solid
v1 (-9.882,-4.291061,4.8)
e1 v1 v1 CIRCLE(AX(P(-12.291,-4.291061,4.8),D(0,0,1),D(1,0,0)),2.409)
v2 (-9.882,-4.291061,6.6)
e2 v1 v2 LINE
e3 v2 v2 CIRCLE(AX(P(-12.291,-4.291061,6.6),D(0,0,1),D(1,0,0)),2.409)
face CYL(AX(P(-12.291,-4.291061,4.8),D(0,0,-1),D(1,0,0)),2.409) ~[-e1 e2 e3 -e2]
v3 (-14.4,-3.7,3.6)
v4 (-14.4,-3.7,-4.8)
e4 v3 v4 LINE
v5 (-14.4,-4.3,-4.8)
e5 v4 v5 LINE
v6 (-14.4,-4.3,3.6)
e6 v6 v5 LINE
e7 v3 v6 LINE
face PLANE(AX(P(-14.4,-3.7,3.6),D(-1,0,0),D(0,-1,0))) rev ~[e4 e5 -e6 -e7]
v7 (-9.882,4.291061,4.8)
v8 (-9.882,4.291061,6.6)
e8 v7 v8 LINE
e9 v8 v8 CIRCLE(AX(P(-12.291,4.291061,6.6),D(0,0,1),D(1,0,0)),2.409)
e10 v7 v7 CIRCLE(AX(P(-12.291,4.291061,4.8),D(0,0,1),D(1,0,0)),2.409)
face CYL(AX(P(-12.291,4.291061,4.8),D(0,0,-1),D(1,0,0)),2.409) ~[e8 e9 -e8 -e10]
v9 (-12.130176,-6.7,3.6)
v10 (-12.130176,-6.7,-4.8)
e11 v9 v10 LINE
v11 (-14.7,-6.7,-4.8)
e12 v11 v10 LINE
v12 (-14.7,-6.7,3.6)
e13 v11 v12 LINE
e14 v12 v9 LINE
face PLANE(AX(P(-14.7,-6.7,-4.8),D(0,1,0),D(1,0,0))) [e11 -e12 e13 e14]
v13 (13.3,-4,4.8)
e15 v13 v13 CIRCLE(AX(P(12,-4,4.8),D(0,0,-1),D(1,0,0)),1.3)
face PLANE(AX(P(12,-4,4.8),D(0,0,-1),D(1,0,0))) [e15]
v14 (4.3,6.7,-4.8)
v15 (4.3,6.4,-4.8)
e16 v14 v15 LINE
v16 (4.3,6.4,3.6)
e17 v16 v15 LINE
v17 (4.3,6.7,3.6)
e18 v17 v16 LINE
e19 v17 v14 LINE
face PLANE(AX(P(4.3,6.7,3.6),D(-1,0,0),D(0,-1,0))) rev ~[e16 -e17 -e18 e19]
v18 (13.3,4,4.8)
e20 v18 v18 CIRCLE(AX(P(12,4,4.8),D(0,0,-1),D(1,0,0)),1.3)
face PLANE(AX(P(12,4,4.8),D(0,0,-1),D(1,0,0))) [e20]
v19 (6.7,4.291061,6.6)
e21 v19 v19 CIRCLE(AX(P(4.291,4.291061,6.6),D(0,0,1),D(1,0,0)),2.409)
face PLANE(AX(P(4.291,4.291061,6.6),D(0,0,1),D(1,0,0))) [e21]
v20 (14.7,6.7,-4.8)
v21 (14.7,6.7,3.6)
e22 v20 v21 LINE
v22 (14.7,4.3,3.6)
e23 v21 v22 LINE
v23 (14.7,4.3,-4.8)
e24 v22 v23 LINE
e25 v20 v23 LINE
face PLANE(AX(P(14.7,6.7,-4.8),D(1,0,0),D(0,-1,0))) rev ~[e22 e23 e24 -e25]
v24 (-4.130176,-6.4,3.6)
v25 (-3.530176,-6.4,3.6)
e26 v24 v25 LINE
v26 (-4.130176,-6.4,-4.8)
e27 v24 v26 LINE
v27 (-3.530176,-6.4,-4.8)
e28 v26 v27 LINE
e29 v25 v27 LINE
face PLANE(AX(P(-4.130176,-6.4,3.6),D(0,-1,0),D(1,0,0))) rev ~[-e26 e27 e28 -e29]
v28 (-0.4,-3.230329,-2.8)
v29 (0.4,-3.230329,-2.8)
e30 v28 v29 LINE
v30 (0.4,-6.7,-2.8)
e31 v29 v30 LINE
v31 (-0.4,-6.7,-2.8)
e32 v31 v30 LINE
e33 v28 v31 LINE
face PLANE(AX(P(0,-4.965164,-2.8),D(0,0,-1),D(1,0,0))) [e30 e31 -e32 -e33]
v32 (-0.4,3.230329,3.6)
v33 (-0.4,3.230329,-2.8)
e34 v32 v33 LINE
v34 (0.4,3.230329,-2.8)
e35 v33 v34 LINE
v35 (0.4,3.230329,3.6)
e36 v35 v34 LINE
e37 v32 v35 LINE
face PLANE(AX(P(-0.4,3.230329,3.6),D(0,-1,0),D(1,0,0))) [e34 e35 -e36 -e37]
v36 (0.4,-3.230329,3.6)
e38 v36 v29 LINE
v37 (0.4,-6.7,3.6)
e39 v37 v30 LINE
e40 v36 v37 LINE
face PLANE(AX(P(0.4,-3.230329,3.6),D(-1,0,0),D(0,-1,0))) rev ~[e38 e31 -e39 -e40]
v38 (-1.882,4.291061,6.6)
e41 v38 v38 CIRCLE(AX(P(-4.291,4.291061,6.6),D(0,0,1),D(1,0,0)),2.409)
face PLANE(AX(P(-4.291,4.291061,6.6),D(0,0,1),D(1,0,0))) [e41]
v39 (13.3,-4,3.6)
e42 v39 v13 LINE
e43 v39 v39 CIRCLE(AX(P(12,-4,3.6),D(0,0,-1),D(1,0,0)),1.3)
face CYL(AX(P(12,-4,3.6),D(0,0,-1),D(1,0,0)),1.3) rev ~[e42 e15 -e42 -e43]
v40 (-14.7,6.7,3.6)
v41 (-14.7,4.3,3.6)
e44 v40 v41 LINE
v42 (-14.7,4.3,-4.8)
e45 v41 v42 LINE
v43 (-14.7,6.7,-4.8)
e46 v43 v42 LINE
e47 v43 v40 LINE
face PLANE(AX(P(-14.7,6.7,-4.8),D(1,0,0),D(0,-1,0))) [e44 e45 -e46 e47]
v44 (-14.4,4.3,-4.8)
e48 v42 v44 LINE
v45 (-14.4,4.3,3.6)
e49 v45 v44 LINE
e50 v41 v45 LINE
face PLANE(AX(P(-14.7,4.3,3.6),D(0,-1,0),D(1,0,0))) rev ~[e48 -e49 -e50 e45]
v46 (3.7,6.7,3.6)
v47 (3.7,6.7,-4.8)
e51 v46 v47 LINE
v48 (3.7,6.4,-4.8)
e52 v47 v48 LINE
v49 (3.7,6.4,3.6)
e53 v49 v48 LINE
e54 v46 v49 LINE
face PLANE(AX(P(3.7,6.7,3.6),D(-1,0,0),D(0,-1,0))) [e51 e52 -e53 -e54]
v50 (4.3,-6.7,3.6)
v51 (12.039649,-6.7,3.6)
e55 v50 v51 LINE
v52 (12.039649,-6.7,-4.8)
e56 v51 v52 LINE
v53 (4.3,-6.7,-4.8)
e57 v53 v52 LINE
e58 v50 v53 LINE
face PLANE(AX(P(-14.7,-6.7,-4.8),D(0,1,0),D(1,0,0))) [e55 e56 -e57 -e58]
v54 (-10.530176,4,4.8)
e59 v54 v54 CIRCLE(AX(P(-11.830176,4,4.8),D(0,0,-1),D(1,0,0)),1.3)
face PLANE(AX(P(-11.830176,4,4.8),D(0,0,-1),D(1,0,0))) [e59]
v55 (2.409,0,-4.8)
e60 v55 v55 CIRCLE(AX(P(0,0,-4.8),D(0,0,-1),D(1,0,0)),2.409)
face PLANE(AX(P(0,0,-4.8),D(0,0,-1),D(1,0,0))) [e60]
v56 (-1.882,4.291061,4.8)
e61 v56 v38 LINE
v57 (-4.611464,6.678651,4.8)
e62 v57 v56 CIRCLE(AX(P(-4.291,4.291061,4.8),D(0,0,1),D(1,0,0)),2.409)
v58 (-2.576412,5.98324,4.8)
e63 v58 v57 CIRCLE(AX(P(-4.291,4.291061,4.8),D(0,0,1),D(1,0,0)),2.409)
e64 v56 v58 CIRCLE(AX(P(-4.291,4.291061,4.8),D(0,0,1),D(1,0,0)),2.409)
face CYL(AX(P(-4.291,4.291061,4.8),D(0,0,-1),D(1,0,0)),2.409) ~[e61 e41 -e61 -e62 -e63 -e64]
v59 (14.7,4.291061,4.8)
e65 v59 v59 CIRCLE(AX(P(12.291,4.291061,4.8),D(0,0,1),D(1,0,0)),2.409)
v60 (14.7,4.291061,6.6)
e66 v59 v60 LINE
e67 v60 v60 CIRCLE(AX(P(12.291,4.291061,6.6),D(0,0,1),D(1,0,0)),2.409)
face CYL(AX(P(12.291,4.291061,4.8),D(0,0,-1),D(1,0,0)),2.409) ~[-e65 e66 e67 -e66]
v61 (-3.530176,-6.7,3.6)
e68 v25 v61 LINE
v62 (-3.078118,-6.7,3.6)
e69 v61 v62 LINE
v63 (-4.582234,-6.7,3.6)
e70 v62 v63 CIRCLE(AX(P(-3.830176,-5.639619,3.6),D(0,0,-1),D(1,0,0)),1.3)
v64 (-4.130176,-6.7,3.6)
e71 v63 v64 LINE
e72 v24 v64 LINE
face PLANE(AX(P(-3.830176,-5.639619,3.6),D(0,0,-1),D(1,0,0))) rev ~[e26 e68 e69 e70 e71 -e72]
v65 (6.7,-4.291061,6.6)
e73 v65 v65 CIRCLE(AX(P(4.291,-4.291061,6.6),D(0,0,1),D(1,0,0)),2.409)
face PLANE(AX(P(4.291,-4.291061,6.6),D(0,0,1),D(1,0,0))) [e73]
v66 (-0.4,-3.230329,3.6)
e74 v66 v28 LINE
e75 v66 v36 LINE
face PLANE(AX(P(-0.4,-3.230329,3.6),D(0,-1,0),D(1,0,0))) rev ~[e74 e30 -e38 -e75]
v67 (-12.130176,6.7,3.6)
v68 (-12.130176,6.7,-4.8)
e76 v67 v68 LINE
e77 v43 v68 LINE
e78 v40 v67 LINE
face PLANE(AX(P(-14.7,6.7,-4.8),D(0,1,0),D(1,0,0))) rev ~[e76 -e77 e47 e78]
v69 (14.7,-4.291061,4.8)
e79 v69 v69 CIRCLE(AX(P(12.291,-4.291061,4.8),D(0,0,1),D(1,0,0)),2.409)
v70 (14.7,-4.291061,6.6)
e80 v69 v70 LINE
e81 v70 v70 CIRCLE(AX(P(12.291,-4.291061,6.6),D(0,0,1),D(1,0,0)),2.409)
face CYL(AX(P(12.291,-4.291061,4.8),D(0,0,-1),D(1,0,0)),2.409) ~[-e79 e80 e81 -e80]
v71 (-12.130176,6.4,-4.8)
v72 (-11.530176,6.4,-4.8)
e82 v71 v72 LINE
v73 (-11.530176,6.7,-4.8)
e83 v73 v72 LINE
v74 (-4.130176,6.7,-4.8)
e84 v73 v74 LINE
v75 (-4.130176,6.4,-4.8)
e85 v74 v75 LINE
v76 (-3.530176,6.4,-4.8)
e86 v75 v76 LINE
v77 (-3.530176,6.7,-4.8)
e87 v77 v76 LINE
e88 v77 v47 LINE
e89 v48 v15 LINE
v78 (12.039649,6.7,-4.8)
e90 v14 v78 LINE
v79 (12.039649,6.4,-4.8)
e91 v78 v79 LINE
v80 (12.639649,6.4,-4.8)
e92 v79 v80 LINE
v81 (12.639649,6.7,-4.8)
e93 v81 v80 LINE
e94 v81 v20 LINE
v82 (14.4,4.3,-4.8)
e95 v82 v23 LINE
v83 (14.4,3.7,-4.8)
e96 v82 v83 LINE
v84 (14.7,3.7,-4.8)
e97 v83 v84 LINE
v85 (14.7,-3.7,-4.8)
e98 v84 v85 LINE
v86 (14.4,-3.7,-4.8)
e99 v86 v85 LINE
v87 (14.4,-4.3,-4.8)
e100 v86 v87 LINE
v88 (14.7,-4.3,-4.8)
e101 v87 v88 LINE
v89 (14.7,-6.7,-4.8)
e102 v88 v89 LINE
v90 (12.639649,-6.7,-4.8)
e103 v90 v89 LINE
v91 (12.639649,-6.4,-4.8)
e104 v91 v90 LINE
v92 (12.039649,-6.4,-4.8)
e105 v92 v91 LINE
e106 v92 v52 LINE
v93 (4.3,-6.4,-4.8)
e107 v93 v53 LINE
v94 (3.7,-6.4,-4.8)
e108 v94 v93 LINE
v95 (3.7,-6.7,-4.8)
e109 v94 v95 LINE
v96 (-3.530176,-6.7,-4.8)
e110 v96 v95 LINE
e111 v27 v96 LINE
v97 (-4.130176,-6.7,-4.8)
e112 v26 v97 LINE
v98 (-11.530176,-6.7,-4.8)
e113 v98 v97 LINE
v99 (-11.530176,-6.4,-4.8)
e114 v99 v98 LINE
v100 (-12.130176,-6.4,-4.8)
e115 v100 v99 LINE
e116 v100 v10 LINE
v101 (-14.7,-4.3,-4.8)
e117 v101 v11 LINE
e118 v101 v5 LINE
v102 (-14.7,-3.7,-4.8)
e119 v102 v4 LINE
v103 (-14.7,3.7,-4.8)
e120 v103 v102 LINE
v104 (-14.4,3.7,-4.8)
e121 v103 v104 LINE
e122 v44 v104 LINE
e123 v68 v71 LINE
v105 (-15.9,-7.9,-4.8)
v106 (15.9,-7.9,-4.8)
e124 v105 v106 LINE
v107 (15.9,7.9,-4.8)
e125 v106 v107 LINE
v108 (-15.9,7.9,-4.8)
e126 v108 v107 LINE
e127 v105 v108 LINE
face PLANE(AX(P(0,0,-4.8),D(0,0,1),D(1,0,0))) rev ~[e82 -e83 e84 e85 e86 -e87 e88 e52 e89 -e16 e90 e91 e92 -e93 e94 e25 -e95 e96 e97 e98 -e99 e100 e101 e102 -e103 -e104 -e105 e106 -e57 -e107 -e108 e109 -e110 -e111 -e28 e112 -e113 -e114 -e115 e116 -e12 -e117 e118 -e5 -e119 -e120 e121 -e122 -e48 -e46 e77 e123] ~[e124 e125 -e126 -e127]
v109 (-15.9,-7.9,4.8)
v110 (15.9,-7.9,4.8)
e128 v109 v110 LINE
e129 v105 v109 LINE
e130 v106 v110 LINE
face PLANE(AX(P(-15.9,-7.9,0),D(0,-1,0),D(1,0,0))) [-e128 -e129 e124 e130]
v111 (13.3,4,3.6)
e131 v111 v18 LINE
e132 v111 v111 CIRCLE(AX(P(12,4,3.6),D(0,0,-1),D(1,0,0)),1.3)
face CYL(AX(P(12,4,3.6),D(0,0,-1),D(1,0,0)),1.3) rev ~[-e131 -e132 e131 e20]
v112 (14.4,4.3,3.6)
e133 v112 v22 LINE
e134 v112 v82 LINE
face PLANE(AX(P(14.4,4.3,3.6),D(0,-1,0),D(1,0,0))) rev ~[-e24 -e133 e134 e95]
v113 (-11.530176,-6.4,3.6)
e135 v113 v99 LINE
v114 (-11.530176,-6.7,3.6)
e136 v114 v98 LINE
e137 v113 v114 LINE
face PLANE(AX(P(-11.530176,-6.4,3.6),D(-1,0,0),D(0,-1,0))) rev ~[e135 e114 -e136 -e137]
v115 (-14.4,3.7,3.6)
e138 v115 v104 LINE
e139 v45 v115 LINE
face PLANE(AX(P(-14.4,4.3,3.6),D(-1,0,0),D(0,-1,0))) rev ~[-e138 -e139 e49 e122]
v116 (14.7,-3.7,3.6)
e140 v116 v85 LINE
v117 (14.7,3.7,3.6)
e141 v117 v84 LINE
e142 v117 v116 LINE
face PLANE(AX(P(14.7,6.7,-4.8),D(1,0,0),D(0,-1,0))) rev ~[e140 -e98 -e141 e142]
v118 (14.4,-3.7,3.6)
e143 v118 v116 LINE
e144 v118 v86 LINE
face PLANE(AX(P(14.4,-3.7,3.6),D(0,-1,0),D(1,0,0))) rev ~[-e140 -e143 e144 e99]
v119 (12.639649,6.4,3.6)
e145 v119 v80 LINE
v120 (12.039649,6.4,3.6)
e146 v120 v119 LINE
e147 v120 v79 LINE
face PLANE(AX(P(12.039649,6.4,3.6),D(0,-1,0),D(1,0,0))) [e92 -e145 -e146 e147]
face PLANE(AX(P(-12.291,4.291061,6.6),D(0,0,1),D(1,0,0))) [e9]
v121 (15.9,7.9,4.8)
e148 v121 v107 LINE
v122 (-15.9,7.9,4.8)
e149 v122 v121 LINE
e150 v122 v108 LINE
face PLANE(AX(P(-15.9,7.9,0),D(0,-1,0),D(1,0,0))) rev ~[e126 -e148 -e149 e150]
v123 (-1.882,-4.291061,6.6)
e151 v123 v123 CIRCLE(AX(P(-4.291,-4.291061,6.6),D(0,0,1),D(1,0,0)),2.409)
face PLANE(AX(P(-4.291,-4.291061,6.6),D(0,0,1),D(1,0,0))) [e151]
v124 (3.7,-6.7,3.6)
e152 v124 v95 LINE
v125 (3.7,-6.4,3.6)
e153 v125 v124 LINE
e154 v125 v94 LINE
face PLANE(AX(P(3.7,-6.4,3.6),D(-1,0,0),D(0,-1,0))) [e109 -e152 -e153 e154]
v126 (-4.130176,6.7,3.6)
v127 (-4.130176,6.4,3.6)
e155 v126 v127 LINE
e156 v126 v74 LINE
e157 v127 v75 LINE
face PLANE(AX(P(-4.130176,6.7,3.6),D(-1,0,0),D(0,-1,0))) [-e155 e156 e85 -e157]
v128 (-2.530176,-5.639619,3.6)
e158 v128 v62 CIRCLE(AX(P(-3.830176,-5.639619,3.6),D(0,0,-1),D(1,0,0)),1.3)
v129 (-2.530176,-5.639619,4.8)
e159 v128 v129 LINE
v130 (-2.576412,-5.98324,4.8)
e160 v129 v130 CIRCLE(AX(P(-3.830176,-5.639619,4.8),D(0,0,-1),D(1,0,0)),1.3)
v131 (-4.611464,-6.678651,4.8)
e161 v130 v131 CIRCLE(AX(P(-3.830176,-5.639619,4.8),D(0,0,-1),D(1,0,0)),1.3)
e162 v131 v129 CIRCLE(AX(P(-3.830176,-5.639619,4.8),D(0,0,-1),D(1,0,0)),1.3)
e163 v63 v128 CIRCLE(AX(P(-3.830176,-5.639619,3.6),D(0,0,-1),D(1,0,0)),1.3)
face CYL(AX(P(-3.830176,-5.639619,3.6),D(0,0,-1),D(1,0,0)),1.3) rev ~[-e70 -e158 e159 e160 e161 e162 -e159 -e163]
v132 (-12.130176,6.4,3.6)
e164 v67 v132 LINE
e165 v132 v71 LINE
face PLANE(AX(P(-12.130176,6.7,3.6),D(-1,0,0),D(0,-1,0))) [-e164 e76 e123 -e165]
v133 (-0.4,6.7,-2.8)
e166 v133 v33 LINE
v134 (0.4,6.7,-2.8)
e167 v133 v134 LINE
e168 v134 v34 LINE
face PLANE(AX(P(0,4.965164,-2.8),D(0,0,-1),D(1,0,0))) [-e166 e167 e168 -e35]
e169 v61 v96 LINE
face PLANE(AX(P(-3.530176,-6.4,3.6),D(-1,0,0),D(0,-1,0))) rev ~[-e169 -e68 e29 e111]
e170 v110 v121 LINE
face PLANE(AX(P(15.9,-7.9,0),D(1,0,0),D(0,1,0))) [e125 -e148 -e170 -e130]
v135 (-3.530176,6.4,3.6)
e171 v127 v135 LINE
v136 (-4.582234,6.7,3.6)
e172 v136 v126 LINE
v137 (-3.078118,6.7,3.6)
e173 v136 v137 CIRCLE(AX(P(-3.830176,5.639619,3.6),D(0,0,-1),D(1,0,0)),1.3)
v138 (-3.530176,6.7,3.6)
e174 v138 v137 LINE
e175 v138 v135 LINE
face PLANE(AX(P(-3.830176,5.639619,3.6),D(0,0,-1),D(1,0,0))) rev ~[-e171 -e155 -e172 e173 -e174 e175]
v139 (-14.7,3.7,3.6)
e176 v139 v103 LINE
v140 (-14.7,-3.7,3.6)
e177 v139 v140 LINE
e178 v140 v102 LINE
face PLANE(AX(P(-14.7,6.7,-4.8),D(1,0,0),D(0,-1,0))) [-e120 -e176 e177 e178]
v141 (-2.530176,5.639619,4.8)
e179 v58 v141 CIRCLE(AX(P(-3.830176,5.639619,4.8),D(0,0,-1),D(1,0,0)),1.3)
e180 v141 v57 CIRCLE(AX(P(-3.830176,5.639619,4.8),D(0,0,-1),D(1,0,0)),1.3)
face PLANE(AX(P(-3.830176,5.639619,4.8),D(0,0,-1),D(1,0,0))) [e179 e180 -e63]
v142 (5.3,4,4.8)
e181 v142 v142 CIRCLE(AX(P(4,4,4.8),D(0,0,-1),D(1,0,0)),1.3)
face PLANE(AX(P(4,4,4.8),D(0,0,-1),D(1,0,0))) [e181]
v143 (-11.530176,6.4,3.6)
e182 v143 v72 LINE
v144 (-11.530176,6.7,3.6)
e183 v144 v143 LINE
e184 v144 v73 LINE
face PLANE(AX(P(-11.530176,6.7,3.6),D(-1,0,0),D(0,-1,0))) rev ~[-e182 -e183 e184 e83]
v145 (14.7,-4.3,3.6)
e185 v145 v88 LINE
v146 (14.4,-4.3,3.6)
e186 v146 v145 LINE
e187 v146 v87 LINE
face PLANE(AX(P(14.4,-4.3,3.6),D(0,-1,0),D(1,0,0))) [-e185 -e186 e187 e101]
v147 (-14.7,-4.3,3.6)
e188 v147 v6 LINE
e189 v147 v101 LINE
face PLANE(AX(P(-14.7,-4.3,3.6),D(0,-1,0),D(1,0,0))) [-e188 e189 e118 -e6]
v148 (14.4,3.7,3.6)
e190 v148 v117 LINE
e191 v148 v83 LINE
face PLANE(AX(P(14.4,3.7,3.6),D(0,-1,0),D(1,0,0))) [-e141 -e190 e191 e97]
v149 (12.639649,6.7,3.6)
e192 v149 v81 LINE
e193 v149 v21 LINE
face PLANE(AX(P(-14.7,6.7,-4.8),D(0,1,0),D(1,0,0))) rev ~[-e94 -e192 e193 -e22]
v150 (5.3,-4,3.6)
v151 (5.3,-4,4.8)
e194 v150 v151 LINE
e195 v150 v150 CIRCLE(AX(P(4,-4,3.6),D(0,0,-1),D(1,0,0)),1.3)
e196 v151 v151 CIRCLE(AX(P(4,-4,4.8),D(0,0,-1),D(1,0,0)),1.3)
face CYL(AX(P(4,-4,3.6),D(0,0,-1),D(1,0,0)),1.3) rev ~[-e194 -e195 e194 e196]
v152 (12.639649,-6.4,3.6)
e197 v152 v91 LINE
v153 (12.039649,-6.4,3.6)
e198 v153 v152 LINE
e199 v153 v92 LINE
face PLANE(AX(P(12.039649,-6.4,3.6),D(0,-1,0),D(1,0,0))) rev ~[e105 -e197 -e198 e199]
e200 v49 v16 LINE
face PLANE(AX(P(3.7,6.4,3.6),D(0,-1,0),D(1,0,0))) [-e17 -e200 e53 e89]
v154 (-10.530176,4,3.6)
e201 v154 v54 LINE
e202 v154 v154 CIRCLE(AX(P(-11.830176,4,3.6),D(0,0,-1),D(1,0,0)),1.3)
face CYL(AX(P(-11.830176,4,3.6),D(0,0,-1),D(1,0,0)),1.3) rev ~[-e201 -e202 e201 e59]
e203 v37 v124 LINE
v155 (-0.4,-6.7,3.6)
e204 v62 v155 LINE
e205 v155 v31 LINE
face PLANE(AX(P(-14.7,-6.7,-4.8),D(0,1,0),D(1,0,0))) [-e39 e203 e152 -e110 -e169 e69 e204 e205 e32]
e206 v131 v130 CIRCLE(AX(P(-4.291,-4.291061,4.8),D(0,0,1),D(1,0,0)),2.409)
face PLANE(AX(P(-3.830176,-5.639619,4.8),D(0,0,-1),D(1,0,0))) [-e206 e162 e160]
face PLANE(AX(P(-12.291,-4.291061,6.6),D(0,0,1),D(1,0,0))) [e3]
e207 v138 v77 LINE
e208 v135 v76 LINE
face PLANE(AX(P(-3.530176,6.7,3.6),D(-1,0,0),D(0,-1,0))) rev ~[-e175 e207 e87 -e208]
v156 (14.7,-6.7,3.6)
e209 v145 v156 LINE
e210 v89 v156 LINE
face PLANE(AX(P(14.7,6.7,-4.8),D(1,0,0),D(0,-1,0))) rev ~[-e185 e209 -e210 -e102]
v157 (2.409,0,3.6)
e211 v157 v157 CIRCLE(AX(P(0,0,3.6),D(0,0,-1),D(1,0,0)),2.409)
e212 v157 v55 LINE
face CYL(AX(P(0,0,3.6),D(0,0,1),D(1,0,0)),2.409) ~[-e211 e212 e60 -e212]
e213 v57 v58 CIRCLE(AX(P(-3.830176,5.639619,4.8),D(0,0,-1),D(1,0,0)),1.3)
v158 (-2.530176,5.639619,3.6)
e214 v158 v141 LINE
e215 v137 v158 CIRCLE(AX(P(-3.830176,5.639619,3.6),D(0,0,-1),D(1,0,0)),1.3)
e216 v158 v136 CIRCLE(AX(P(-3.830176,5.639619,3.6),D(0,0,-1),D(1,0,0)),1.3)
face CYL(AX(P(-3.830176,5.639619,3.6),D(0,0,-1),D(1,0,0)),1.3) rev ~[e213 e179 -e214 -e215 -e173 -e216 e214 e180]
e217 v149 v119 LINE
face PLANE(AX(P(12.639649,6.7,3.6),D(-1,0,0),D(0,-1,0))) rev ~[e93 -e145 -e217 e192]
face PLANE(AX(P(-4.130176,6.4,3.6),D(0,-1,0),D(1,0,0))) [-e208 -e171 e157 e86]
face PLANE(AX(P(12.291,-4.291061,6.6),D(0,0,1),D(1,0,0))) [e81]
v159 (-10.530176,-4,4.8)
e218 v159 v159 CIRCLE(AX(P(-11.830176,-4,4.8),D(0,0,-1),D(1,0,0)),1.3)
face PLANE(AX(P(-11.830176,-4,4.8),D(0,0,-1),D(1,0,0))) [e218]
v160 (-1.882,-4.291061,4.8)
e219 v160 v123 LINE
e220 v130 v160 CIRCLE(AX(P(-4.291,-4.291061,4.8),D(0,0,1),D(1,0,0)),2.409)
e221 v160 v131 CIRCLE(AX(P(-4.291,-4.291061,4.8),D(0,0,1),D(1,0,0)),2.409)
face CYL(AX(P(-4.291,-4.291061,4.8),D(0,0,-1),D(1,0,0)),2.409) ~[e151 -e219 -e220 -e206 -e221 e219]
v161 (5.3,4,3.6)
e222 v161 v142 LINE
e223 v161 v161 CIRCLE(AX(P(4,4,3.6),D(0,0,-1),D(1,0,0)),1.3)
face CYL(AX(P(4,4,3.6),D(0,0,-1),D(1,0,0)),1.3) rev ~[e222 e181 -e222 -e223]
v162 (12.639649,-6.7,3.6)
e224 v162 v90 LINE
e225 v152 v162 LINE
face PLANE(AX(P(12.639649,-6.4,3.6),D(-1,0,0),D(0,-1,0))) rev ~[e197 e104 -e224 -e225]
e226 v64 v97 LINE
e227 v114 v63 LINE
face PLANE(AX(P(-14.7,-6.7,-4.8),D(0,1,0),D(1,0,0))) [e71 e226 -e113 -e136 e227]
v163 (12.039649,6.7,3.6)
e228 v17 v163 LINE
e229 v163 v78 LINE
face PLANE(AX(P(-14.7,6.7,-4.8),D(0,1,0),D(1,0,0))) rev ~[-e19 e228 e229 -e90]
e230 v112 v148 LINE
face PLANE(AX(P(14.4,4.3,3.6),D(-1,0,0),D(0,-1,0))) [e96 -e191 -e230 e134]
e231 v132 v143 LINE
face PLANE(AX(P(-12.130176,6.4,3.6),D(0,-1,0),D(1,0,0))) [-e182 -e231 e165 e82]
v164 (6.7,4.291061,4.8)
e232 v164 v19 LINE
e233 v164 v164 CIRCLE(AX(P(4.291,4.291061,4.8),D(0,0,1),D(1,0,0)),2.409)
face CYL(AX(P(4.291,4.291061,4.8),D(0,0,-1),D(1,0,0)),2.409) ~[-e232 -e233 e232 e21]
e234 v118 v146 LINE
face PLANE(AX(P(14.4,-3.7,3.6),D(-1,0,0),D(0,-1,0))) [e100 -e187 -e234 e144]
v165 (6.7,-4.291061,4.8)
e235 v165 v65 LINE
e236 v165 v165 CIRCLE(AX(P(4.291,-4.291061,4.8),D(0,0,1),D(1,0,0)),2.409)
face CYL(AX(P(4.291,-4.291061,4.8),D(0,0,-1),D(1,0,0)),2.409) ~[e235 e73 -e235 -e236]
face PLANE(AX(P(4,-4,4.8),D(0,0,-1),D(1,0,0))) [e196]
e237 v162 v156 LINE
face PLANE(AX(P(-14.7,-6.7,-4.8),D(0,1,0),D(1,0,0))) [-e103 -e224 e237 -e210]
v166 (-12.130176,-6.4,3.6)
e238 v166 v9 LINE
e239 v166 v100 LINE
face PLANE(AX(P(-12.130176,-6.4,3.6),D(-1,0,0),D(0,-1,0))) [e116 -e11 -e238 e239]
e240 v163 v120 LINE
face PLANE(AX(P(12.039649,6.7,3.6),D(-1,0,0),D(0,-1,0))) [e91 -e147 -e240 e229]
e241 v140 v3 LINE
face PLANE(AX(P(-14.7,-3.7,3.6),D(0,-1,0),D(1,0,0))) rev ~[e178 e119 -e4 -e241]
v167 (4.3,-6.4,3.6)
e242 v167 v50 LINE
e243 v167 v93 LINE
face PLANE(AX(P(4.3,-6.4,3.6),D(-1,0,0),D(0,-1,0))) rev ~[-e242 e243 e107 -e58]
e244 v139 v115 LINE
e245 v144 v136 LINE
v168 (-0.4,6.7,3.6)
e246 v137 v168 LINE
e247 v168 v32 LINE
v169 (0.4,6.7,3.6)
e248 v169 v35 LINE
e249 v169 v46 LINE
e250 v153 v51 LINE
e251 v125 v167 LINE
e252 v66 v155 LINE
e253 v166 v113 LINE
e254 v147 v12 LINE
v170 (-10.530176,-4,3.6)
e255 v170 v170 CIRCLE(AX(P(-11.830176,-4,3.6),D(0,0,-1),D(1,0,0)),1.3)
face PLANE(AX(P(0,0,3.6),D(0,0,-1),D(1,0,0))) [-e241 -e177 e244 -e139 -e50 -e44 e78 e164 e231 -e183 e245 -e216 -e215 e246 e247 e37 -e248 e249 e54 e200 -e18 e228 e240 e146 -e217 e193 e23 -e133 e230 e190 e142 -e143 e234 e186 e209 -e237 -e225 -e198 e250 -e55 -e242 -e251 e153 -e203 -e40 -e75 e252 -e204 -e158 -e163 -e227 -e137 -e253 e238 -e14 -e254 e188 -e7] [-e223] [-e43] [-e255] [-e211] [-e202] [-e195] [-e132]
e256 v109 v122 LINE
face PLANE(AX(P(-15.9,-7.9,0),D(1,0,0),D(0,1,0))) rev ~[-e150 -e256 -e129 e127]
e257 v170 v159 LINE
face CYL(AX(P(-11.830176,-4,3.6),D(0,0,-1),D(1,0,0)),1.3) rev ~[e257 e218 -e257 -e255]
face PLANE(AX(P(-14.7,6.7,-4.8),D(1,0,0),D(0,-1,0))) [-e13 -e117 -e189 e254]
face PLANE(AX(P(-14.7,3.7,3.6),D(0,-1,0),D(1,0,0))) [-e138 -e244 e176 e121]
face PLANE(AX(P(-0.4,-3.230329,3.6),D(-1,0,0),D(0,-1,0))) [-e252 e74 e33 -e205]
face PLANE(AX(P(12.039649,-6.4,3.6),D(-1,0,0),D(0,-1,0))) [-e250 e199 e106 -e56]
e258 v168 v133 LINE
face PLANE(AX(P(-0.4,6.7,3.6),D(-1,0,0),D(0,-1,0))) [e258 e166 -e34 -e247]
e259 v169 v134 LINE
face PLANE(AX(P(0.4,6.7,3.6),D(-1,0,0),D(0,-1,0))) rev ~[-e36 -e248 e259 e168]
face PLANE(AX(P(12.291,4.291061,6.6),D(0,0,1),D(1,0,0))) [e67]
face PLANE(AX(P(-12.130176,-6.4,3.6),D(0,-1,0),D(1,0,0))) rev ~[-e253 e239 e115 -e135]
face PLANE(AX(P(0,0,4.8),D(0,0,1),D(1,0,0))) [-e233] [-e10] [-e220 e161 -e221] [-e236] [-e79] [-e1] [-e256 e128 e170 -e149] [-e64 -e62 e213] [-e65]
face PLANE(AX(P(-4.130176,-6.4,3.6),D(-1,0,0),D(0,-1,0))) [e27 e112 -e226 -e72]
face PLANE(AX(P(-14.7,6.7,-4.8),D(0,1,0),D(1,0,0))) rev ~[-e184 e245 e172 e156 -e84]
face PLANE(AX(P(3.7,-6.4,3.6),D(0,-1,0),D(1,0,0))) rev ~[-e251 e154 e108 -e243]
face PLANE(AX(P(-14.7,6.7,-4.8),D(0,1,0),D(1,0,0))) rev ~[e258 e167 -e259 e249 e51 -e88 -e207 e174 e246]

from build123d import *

# Parameters (mm, degrees)
F0_W      = 31.8
F0_H      = 15.8
F1_DEPTH  = 4.8
F2_W      = 29.4
F2_H      = 13.4
F3_DEPTH  = 8.4
F4_R      = 2.409
F5_DEPTH  = 1.8
F6_R      = 1.3
F7_DEPTH  = 1.2
F8_R      = 2.409
F9_DEPTH  = 8.4
F10_W     = 0.3
F10_H     = 0.6
F11_DEPTH = 8.4
F12_W     = 0.6
F12_H     = 0.3
F13_DEPTH = 8.4
F14_W     = 0.8
F14_H     = 3.4696710694
F15_DEPTH = 6.4


with BuildPart() as f1:
    # F0 (on Top) → F1 (new body, symmetric)
    with BuildSketch(Plane.XY):
        Rectangle(F0_W, F0_H)
    extrude(amount=F1_DEPTH, both=True)

    # F2 (on face) → F3 (cut)
    with BuildSketch(Plane(origin=(0, 0, -4.8), x_dir=(1, 0, 0), z_dir=(0, 0, -1))):
        Rectangle(F2_W, F2_H)
    extrude(amount=-F3_DEPTH, mode=Mode.SUBTRACT)

    # F4 (on face) → F5 (join)
    with BuildSketch(Plane.XY.offset(4.8)):
        with Locations((-12.291, 4.2910612803)):
            Circle(F4_R)
        with Locations((12.291, 4.2910612803)):
            Circle(F4_R)
        with Locations((-12.291, -4.2910612803)):
            Circle(F4_R)
        with Locations((12.291, -4.2910612803)):
            Circle(F4_R)
        with Locations((-4.291, 4.2910612803)):
            Circle(F4_R)
        with Locations((4.291, 4.2910612803)):
            Circle(F4_R)
        with Locations((-4.291, -4.2910612803)):
            Circle(F4_R)
        with Locations((4.291, -4.2910612803)):
            Circle(F4_R)
    extrude(amount=F5_DEPTH)

    # F6 (on face) → F7 (cut)
    with BuildSketch(Plane(origin=(0, 0, 3.6), x_dir=(1, 0, 0), z_dir=(0, 0, -1))):
        with Locations((-11.8301756735, 4)):
            Circle(F6_R)
        with Locations((-3.8301756735, 5.6396185296)):
            Circle(F6_R)
        with Locations((4, 4)):
            Circle(F6_R)
        with Locations((12, 4)):
            Circle(F6_R)
        with Locations((-11.8301756735, -4)):
            Circle(F6_R)
        with Locations((-3.8301756735, -5.6396185296)):
            Circle(F6_R)
        with Locations((4, -4)):
            Circle(F6_R)
        with Locations((12, -4)):
            Circle(F6_R)
    extrude(amount=-F7_DEPTH, mode=Mode.SUBTRACT)

    # F8 (on face) → F9 (join, through all)
    with BuildSketch(Plane(origin=(0, 0, 3.6), x_dir=(1, 0, 0), z_dir=(0, 0, -1))):
        Circle(F8_R)
    extrude(amount=F9_DEPTH)

    # F10 (on face) → F11 (join, through all)
    with BuildSketch(Plane(origin=(0, 0, 3.6), x_dir=(1, 0, 0), z_dir=(0, 0, -1))):
        with Locations((-14.55, 4)):
            Rectangle(F10_W, F10_H)
        with Locations((-14.55, -4)):
            Rectangle(F10_W, F10_H)
        with Locations((14.55, 4)):
            Rectangle(F10_W, F10_H)
        with Locations((14.55, -4)):
            Rectangle(F10_W, F10_H)
    extrude(amount=F11_DEPTH)

    # F12 (on face) → F13 (join, through all)
    with BuildSketch(Plane(origin=(0, 0, 3.6), x_dir=(1, 0, 0), z_dir=(0, 0, -1))):
        with Locations((-11.8301756735, 6.55)):
            Rectangle(F12_W, F12_H)
        with Locations((-3.8301756735, 6.55)):
            Rectangle(F12_W, F12_H)
        with Locations((4, 6.55)):
            Rectangle(F12_W, F12_H)
        with Locations((12.3396486531, 6.55)):
            Rectangle(F12_W, F12_H)
        with Locations((-3.8301756735, -6.55)):
            Rectangle(F12_W, F12_H)
        with Locations((-11.8301756735, -6.55)):
            Rectangle(F12_W, F12_H)
        with Locations((4, -6.55)):
            Rectangle(F12_W, F12_H)
        with Locations((12.3396486531, -6.55)):
            Rectangle(F12_W, F12_H)
    extrude(amount=F13_DEPTH)

    # F14 (on face) → F15 (join)
    with BuildSketch(Plane(origin=(0, 0, 3.6), x_dir=(1, 0, 0), z_dir=(0, 0, -1))):
        with Locations((0, 4.9651644653)):
            Rectangle(F14_W, F14_H)
        with Locations((0, -4.9651644653)):
            Rectangle(F14_W, F14_H)
    extrude(amount=F15_DEPTH)


solid = f1.part
